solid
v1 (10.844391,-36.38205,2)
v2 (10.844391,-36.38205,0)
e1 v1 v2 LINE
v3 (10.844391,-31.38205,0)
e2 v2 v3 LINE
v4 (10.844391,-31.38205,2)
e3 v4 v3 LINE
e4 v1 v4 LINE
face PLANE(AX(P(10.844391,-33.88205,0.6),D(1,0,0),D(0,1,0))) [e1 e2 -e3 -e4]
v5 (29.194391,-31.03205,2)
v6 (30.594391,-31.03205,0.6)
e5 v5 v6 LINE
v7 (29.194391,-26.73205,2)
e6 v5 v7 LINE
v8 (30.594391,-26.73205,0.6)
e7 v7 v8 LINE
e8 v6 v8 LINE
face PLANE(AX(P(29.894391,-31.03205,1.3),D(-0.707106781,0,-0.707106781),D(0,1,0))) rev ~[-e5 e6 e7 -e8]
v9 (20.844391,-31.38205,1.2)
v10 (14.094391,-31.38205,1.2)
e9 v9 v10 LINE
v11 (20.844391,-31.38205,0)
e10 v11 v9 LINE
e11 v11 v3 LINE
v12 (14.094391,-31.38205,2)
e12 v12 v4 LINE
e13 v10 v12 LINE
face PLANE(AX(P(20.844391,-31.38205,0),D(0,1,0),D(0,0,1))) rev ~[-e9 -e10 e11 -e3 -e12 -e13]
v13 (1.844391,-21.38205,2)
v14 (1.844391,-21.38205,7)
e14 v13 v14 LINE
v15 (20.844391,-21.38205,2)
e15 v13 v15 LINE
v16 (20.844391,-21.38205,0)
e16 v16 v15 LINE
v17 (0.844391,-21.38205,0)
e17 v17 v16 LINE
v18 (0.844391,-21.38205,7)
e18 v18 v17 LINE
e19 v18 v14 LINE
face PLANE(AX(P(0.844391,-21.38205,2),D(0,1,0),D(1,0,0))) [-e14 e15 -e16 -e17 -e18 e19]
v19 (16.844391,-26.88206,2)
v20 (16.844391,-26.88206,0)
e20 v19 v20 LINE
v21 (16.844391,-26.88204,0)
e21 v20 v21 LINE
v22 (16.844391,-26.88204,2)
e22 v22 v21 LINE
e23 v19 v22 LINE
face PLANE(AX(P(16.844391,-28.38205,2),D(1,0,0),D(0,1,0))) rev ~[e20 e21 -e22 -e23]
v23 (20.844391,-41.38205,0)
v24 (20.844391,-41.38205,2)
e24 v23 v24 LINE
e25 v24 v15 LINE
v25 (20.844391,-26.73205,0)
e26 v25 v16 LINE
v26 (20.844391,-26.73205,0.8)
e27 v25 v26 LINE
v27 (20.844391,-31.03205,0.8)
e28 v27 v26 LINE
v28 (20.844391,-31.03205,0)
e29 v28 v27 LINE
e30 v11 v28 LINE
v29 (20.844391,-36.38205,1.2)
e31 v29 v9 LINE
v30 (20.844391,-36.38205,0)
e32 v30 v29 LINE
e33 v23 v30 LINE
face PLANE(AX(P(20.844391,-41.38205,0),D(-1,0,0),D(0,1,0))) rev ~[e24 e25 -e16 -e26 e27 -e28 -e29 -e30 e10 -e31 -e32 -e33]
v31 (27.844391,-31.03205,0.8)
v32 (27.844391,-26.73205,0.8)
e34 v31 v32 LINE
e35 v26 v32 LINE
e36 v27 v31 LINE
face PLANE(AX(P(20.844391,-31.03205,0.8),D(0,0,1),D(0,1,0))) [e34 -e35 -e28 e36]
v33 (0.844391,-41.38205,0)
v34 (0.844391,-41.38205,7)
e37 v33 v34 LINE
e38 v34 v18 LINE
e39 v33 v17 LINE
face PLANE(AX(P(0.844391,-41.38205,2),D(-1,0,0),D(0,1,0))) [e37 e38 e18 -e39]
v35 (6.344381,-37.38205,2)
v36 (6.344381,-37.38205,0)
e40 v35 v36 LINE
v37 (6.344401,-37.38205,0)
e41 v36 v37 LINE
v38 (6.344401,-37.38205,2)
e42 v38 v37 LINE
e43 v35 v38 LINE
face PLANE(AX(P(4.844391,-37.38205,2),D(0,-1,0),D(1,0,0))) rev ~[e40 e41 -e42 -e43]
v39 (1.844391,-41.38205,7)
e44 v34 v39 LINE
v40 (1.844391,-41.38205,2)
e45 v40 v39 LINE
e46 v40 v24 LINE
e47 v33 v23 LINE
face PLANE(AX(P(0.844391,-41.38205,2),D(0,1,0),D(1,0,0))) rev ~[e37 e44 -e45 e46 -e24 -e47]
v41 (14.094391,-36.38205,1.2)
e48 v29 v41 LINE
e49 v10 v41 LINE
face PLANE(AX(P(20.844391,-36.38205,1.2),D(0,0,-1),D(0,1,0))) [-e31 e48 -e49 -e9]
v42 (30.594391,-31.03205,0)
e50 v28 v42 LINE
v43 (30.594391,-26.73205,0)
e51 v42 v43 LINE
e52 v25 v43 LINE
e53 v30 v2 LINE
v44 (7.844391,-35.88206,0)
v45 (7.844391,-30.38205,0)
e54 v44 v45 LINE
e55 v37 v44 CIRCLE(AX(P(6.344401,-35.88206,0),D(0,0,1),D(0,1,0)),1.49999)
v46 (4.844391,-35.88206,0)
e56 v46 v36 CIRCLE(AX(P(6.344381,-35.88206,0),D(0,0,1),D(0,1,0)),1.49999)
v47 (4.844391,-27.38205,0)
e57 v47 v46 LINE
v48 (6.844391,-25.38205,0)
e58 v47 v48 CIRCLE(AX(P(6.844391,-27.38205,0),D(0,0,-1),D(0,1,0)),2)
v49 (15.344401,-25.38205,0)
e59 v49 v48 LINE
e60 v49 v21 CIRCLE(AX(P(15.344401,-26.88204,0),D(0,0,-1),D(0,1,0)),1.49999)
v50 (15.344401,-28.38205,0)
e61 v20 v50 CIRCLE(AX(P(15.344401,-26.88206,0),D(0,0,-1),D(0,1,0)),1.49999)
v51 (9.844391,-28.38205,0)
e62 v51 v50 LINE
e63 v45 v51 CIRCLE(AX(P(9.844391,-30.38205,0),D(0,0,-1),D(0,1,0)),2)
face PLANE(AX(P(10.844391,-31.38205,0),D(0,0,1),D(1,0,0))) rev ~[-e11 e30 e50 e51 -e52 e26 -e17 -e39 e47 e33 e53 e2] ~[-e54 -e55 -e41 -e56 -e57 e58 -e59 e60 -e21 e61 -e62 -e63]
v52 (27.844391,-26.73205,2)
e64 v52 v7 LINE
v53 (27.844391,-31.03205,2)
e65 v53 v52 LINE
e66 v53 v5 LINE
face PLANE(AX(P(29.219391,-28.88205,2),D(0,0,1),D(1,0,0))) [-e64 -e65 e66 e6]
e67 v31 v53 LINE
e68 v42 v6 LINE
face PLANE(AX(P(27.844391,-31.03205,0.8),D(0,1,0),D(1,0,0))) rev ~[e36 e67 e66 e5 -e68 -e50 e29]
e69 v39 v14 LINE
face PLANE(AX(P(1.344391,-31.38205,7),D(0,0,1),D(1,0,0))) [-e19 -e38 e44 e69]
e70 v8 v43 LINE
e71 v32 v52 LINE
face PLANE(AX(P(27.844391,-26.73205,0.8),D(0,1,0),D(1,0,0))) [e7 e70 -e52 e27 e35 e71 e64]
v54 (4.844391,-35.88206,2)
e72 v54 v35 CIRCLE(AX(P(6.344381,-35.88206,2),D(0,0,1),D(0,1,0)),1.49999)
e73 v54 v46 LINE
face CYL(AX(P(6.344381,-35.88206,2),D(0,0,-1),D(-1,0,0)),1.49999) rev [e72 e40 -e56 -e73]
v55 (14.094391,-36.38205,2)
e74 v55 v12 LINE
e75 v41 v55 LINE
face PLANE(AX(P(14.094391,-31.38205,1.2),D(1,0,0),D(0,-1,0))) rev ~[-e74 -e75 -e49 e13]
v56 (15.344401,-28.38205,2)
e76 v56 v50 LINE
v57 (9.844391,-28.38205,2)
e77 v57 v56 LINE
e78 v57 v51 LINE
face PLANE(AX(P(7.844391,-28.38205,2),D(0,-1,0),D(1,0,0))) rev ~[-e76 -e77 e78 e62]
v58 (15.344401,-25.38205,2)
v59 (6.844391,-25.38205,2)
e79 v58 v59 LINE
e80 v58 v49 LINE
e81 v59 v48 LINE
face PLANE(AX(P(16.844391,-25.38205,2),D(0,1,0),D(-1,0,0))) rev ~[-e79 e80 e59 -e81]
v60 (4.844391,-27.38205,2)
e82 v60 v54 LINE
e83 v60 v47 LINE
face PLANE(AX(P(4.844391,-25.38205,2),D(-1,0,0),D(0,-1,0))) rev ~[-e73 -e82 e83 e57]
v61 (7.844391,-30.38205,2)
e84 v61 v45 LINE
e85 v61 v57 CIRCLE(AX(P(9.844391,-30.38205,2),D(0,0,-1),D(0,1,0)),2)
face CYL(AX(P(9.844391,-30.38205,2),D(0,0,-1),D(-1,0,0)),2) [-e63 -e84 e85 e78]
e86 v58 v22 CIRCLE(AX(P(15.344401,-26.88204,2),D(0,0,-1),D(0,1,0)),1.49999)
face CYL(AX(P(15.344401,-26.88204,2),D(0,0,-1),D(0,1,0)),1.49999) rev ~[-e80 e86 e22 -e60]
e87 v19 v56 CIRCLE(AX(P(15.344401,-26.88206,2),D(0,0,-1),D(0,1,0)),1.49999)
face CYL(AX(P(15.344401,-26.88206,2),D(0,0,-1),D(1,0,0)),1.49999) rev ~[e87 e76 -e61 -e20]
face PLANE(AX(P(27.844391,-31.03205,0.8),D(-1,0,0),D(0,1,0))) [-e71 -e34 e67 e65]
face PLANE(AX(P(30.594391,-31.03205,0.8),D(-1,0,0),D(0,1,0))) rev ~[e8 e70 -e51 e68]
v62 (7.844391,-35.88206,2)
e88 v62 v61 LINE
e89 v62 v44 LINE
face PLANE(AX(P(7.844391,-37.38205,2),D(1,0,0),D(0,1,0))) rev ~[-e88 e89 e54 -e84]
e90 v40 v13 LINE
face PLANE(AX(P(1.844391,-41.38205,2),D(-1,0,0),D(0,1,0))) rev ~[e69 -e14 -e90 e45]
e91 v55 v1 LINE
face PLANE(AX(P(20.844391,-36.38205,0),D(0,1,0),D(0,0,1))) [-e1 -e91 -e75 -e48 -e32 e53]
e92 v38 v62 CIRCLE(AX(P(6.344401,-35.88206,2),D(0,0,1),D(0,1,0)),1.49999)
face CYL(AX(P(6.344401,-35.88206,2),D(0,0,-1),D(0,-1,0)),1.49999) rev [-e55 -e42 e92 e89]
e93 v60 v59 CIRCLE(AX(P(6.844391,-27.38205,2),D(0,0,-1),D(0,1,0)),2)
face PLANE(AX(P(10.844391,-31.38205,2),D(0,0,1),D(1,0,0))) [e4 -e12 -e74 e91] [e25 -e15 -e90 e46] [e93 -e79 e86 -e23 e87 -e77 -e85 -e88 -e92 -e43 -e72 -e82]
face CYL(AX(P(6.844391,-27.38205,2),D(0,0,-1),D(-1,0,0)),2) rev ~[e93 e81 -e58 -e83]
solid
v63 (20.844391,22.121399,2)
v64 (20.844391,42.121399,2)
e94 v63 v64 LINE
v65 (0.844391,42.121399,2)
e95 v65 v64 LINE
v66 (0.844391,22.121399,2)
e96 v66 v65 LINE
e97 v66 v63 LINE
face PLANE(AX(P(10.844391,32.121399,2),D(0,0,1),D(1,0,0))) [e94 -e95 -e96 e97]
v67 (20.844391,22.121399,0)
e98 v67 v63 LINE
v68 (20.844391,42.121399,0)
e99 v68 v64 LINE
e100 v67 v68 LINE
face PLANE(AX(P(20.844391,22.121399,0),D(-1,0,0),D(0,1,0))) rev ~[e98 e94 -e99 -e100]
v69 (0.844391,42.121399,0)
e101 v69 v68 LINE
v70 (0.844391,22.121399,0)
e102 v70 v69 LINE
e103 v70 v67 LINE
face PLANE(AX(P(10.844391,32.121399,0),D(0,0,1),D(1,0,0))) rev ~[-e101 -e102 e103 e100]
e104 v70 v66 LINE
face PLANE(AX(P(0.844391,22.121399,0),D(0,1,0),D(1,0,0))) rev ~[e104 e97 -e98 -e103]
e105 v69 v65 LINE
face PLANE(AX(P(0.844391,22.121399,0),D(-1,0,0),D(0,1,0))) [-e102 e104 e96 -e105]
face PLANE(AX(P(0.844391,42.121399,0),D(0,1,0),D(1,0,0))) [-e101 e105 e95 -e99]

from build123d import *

# Parameters (mm, degrees)
F0_W      = 20
F0_H      = 20
F1_DEPTH  = 2
F2_W      = 5
F2_H      = 1.2
F3_DEPTH  = 10
F4_W      = 3.25
F4_H      = 5
F5_DEPTH  = 0.801
F6_W      = 4.3
F6_H      = 0.8
F7_DEPTH  = 9.75
F8_W      = 2.75
F8_H      = 4.3
F9_DEPTH  = 1.2
F10_SIZE  = 1.4
F11_W     = 1
F11_H     = 20
F12_DEPTH = 5
F14_DEPTH = 2.001
F15_R     = 2
F16_R     = 1.49999


# Not quite as in the source:
# - a fillet or chamfer is up to 0.001 mm smaller than in the source, because OpenCascade refuses the exact size


with BuildPart() as f1:
    # F0 (on Top) → F1 (new body)
    with BuildSketch(Plane.XY):
        with Locations((10.8443908393, -31.3820495651)):
            Rectangle(F0_W, F0_H)
    extrude(amount=F1_DEPTH)

    # F2 (on face) → F3 (cut)
    with BuildSketch(Plane.YZ.offset(20.8443908393)):
        with Locations((-33.8820495651, 0.6)):
            Rectangle(F2_W, F2_H)
    extrude(amount=-F3_DEPTH, mode=Mode.SUBTRACT)

    # F4 (on face) → F5 (cut, through all)
    with BuildSketch(Plane(origin=(0, 0, 1.2), x_dir=(1, 0, 0), z_dir=(0, 0, -1))):
        with Locations((12.4693908393, 33.8820495651)):
            Rectangle(F4_W, F4_H)
    extrude(amount=-F5_DEPTH, mode=Mode.SUBTRACT)

    # F6 (on face) → F7 (join)
    with BuildSketch(Plane.YZ.offset(20.8443908393)):
        with Locations((-28.8820495651, 0.4)):
            Rectangle(F6_W, F6_H)
    extrude(amount=F7_DEPTH)

    # F8 (on face) → F9 (join)
    with BuildSketch(Plane.XY.offset(0.8)):
        with Locations((29.2193908393, -28.8820495651)):
            Rectangle(F8_W, F8_H)
    extrude(amount=F9_DEPTH)

    # F10
    f10_edges = [f1.edges().sort_by_distance(p)[0] for p in [
        (30.594391, -28.88205, 2),
    ]]
    chamfer(f10_edges, length=F10_SIZE)

    # F11 (on face) → F12 (join)
    with BuildSketch(Plane.XY.offset(2)):
        with Locations((1.3443908393, -31.3820495651)):
            Rectangle(F11_W, F11_H)
    extrude(amount=F12_DEPTH)

    # F13 (on face) → F14 (cut, through all)
    with BuildSketch(Plane.XY.offset(2)):
        Polygon((4.8443908393, -25.3820495651), (4.8443908393, -37.3820495651), (7.8443908393, -37.3820495651), (7.8443908393, -28.3820495651), (16.8443908393, -28.3820495651), (16.8443908393, -25.3820495651), align=None)
    extrude(amount=-F14_DEPTH, mode=Mode.SUBTRACT)

    # F15
    f15_edges = [f1.edges().sort_by_distance(p)[0] for p in [
        (7.844391, -28.38205, 1),
        (4.844391, -25.38205, 1),
    ]]
    fillet(f15_edges, radius=F15_R)

    # F16 (radius 1.5 in the source; OpenCascade refuses exactly that, so slightly less here)
    f16_edges = [f1.edges().sort_by_distance(p)[0] for p in [
        (4.844391, -37.38205, 1),
        (7.844391, -37.38205, 1),
        (16.844391, -28.38205, 1),
        (16.844391, -25.38205, 1),
    ]]
    fillet(f16_edges, radius=F16_R)


with BuildPart() as f1b:
    # F0 (on Top) → F1, piece 2 (new body)
    with BuildSketch(Plane.XY):
        with Locations((10.8443908393, 32.1213992728)):
            Rectangle(F0_W, F0_H)
    extrude(amount=F1_DEPTH)


solid = Compound([f1.part, f1b.part])
